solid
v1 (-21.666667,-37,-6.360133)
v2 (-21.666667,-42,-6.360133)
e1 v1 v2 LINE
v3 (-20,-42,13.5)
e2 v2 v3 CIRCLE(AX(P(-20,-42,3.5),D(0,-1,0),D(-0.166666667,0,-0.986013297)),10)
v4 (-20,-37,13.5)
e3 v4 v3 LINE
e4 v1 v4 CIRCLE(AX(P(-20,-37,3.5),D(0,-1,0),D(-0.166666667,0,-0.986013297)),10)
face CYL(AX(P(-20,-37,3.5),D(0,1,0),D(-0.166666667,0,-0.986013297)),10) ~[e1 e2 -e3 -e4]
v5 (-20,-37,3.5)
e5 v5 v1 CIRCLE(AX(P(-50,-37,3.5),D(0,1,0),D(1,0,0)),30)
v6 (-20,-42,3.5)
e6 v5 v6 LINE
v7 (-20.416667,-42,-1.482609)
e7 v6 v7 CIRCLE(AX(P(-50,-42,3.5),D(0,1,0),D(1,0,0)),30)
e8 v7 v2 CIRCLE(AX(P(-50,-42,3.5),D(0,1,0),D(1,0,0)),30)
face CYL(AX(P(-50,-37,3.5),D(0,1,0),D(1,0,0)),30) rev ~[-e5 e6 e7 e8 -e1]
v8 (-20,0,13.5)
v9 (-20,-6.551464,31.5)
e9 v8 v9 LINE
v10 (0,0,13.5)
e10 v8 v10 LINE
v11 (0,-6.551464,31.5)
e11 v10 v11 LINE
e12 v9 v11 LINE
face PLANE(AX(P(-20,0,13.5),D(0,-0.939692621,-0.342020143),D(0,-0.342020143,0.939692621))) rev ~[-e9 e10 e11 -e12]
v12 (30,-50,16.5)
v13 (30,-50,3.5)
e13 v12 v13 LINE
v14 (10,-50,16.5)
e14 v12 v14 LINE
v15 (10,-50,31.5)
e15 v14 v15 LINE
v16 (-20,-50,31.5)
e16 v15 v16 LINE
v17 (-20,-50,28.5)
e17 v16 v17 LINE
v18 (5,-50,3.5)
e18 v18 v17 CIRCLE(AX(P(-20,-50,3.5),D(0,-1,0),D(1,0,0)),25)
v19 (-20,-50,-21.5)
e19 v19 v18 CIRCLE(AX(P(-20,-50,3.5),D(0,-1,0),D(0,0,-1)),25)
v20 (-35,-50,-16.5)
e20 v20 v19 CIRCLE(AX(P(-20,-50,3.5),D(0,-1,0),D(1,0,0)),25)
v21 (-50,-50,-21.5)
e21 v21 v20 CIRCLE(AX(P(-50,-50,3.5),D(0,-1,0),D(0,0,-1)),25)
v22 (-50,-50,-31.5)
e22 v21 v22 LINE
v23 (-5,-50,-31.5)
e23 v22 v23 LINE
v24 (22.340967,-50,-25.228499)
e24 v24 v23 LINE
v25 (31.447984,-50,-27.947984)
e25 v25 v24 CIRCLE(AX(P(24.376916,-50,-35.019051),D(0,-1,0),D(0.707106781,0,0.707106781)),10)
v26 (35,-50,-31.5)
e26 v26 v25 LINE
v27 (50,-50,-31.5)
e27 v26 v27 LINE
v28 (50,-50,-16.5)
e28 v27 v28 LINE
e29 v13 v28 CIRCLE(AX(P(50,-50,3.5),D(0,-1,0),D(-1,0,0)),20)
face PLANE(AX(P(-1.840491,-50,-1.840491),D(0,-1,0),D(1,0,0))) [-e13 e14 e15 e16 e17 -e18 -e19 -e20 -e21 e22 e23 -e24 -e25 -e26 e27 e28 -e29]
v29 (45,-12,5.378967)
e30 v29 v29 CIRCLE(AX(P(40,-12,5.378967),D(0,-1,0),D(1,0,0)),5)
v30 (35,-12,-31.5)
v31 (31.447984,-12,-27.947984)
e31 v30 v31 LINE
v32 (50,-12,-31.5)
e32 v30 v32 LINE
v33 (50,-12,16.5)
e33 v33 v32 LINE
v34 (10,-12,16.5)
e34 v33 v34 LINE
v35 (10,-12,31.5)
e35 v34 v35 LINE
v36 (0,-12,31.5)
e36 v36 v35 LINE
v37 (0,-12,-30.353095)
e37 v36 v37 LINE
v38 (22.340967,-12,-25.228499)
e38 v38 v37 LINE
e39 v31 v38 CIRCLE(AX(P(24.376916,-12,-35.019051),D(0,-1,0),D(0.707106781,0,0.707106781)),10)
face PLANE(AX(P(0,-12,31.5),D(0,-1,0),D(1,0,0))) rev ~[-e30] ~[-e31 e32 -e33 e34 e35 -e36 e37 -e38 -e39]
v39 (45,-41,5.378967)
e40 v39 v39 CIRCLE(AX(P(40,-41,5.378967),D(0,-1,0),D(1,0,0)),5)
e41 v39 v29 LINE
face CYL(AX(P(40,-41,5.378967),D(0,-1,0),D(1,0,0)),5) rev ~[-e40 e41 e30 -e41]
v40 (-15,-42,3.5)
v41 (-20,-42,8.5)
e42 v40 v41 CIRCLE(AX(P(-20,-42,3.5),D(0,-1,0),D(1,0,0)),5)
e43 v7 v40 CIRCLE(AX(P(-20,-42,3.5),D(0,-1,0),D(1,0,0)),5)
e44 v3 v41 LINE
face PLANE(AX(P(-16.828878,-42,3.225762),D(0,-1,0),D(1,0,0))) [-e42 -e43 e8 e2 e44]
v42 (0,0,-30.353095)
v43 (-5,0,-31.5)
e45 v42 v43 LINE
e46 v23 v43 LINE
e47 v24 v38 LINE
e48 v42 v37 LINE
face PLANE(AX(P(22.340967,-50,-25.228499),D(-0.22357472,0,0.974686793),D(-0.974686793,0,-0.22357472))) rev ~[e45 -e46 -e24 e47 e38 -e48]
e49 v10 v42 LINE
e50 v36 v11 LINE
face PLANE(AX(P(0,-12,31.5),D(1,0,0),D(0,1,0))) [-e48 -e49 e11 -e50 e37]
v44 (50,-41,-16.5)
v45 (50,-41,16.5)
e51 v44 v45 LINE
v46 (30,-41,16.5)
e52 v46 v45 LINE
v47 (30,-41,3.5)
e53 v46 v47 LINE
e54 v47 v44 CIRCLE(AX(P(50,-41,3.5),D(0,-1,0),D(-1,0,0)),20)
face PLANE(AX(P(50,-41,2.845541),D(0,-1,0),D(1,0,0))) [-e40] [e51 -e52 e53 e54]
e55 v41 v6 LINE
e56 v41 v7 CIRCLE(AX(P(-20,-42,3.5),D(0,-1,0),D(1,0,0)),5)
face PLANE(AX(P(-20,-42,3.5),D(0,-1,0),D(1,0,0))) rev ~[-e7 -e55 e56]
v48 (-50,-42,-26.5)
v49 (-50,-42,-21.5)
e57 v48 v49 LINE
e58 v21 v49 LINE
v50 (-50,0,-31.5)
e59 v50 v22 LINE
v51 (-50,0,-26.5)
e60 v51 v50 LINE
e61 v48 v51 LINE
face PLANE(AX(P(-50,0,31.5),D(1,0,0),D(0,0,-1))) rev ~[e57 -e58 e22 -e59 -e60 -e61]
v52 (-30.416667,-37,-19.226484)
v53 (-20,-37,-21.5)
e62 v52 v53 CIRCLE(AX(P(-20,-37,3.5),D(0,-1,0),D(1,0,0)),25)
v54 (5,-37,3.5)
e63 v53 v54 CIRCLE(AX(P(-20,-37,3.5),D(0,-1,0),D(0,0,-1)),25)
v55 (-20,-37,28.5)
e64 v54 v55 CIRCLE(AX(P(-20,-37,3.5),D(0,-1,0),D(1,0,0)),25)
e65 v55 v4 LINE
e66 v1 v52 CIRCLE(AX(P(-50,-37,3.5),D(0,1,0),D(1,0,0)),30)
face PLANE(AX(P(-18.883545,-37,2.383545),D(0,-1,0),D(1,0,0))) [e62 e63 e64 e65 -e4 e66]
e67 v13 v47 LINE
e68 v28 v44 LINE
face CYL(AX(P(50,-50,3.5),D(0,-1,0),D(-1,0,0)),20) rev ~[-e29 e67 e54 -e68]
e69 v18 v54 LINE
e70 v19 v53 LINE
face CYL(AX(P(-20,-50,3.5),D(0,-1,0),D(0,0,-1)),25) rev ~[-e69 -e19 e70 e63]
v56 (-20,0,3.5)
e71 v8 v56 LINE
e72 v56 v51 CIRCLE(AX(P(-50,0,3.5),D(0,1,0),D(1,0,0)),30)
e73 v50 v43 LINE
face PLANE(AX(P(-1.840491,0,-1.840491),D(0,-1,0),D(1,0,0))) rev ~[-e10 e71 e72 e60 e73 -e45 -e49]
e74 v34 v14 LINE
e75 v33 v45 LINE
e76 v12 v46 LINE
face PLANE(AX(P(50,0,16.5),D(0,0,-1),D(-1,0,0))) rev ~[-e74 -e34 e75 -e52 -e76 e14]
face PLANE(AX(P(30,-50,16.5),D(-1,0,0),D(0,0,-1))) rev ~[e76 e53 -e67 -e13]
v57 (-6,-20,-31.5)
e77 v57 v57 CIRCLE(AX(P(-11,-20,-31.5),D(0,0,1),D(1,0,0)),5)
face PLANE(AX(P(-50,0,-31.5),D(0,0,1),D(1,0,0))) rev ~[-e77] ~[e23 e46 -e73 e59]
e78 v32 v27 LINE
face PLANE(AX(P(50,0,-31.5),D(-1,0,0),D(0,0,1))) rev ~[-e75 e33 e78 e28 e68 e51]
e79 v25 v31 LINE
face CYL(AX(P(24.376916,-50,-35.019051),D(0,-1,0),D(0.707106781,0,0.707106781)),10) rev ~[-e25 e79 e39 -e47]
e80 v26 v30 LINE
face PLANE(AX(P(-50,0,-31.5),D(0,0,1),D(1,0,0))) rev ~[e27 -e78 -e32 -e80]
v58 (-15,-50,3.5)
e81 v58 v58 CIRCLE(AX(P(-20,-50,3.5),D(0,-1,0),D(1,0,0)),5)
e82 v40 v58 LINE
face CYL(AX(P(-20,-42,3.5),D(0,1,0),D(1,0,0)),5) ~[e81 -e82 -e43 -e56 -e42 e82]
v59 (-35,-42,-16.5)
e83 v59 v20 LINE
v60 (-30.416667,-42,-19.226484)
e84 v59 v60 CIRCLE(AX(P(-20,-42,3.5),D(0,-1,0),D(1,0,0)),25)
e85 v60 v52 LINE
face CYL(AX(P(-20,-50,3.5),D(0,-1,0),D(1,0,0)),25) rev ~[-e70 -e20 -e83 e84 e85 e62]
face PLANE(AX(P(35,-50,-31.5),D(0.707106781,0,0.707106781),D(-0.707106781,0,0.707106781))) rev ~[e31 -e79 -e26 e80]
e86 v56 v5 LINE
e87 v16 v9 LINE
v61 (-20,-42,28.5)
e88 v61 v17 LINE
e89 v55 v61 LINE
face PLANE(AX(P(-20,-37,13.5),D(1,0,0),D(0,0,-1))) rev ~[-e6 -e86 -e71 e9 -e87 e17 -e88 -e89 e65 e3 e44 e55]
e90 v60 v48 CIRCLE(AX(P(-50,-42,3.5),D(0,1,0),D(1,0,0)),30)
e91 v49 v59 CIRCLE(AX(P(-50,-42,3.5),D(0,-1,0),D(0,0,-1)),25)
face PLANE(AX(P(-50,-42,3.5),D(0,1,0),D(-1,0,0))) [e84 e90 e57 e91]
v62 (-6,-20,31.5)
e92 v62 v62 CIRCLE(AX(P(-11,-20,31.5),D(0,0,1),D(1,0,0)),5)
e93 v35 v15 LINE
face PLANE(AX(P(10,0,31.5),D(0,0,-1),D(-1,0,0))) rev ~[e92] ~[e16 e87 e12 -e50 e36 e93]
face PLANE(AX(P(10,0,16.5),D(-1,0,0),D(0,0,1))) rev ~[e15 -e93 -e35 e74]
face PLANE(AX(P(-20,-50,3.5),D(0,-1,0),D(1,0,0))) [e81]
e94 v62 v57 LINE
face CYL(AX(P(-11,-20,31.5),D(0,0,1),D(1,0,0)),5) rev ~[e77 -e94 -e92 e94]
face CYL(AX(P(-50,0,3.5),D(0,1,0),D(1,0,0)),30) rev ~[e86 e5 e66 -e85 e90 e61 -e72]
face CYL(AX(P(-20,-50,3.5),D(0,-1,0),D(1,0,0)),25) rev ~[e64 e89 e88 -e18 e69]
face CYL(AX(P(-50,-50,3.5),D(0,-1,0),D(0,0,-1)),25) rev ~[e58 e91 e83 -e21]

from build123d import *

# Parameters (mm, degrees)
F1_DEPTH  = 50
F3_DEPTH  = 9
F4_R      = 5
F5_DEPTH  = 100
F7_DEPTH  = 8
F9_DEPTH  = 42
F11_DEPTH = 13
F12_W     = 5.5079008639
F12_H     = 3.6583239734
F13_DEPTH = 25
F15_DEPTH = 5
F16_R     = 5
F17_DEPTH = 8
F19_DEPTH = 70.001
F20_W     = 50
F20_H     = 12
F21_DEPTH = 63.001
F22_R     = 5
F23_DEPTH = 63.001
F25_DEPTH = 50.001


with BuildPart() as f1:
    # F0 (on Front) → F1 (new body)
    with BuildSketch(Plane.XZ):
        Polygon((-50, 31.5), (-50, -31.5), (50, -31.5), (50, 16.5), (10, 16.5), (10, 31.5), align=None)
    extrude(amount=F1_DEPTH)

    # F2 (on face) → F3 (cut)
    with BuildSketch(Plane.XZ.offset(50)):
        with BuildLine():
            ThreePointArc((50, -16.5), (64.1421356237, -10.6421356237), (70, 3.5))
            ThreePointArc((70, 3.5), (50, 23.5), (30, 3.5))
            ThreePointArc((30, 3.5), (35.8578643763, -10.6421356237), (50, -16.5))
        make_face()
        with BuildLine():
            Line((30, 16.5), (30, 3.5))
            ThreePointArc((30, 3.5), (31.2386876382, 10.4291527956), (34.8013158464, 16.5))
            Line((34.8013158464, 16.5), (30, 16.5))
        make_face()
    extrude(amount=-F3_DEPTH, mode=Mode.SUBTRACT)

    # F4 (on face) → F5 (cut)
    with BuildSketch(Plane.XZ.offset(41)):
        with Locations((40, 5.378967151)):
            Circle(F4_R)
    extrude(amount=-F5_DEPTH, mode=Mode.SUBTRACT)

    # F6 (on face) → F7 (cut)
    with BuildSketch(Plane.XZ.offset(50)):
        with BuildLine():
            ThreePointArc((-50, -21.5), (-32.3223304703, -14.1776695297), (-25, 3.5))
            ThreePointArc((-25, 3.5), (-67.6776695297, 21.1776695297), (-50, -21.5))
        make_face()
        with BuildLine():
            Line((-50, 31.5), (-50, 28.5))
            ThreePointArc((-50, 28.5), (-32.3223304703, 21.1776695297), (-25, 3.5))
            Line((-25, 3.5), (-25, 31.5))
            Line((-25, 31.5), (-50, 31.5))
        make_face()
    extrude(amount=-F7_DEPTH, mode=Mode.SUBTRACT)

    # F8 (on face) → F9 (cut)
    with BuildSketch(Plane(origin=(0, 0, 0), x_dir=(-1, 0, 0), z_dir=(0, 1, 0))):
        with BuildLine():
            ThreePointArc((50, -26.5), (71.2132034356, -17.7132034356), (80, 3.5))
            ThreePointArc((80, 3.5), (50, 33.5), (20, 3.5))
            ThreePointArc((20, 3.5), (28.7867965644, -17.7132034356), (50, -26.5))
        make_face()
        with BuildLine():
            Line((20, 31.5), (20, 3.5))
            ThreePointArc((20, 3.5), (25.2703630392, 20.4836702684), (39.2296703857, 31.5))
            Line((39.2296703857, 31.5), (20, 31.5))
        make_face()
    extrude(amount=-F9_DEPTH, mode=Mode.SUBTRACT)

    # F10 (on face) → F11 (cut)
    with BuildSketch(Plane.XZ.offset(50)):
        with BuildLine():
            ThreePointArc((-20, -21.5), (-2.3223304703, -14.1776695297), (5, 3.5))
            ThreePointArc((5, 3.5), (-37.6776695297, 21.1776695297), (-20, -21.5))
        make_face()
    extrude(amount=-F11_DEPTH, mode=Mode.SUBTRACT)

    # F12 (on face) → F13 (cut)
    with BuildSketch(Plane(origin=(0, -42, 0), x_dir=(-1, 0, 0), z_dir=(0, 1, 0))):
        with Locations((22.7539504319, 29.6708380133)):
            Rectangle(F12_W, F12_H)
    extrude(amount=-F13_DEPTH, mode=Mode.SUBTRACT)

    # F14 (on face) → F15 (join)
    with BuildSketch(Plane.XZ.offset(37)):
        with BuildLine():
            ThreePointArc((-20, 3.5), (-20.4196010845, -1.5), (-21.6666666667, -6.3601329718))
            ThreePointArc((-21.6666666667, -6.3601329718), (-10.0350281055, 2.6637373972), (-20, 13.5))
            Line((-20, 13.5), (-20, 3.5))
        make_face()
    extrude(amount=F15_DEPTH)

    # F16 (on face) → F17 (join)
    with BuildSketch(Plane.XZ.offset(42)):
        with Locations((-20, 3.5)):
            Circle(F16_R)
    extrude(amount=F17_DEPTH)

    # F18 (on face) → F19 (cut, through all)
    with BuildSketch(Plane(origin=(-20, 0, 0), x_dir=(0, -1, 0), z_dir=(-1, 0, 0))):
        Polygon((0, 31.5), (0, 13.5), (6.5514642168, 31.5), align=None)
    extrude(amount=-F19_DEPTH, mode=Mode.SUBTRACT)

    # F20 (on face) → F21 (cut, through all)
    with BuildSketch(Plane.XY.offset(31.5)):
        with Locations((25, -6)):
            Rectangle(F20_W, F20_H)
    extrude(amount=-F21_DEPTH, mode=Mode.SUBTRACT)

    # F22 (on face) → F23 (cut, through all)
    with BuildSketch(Plane.XY.offset(31.5)):
        with Locations((-11, -20)):
            Circle(F22_R)
    extrude(amount=-F23_DEPTH, mode=Mode.SUBTRACT)

    # F24 (on face) → F25 (cut, through all)
    with BuildSketch(Plane.XZ.offset(50)):
        with BuildLine():
            Line((22.3409673765, -25.2284990706), (-5, -31.5))
            Line((-5, -31.5), (35, -31.5))
            Line((35, -31.5), (31.4479835543, -27.9479835543))
            ThreePointArc((31.4479835543, -27.9479835543), (27.2382101912, -25.437141636), (22.3409673765, -25.2284990706))
        make_face()
    extrude(amount=-F25_DEPTH, mode=Mode.SUBTRACT)


solid = f1.part
